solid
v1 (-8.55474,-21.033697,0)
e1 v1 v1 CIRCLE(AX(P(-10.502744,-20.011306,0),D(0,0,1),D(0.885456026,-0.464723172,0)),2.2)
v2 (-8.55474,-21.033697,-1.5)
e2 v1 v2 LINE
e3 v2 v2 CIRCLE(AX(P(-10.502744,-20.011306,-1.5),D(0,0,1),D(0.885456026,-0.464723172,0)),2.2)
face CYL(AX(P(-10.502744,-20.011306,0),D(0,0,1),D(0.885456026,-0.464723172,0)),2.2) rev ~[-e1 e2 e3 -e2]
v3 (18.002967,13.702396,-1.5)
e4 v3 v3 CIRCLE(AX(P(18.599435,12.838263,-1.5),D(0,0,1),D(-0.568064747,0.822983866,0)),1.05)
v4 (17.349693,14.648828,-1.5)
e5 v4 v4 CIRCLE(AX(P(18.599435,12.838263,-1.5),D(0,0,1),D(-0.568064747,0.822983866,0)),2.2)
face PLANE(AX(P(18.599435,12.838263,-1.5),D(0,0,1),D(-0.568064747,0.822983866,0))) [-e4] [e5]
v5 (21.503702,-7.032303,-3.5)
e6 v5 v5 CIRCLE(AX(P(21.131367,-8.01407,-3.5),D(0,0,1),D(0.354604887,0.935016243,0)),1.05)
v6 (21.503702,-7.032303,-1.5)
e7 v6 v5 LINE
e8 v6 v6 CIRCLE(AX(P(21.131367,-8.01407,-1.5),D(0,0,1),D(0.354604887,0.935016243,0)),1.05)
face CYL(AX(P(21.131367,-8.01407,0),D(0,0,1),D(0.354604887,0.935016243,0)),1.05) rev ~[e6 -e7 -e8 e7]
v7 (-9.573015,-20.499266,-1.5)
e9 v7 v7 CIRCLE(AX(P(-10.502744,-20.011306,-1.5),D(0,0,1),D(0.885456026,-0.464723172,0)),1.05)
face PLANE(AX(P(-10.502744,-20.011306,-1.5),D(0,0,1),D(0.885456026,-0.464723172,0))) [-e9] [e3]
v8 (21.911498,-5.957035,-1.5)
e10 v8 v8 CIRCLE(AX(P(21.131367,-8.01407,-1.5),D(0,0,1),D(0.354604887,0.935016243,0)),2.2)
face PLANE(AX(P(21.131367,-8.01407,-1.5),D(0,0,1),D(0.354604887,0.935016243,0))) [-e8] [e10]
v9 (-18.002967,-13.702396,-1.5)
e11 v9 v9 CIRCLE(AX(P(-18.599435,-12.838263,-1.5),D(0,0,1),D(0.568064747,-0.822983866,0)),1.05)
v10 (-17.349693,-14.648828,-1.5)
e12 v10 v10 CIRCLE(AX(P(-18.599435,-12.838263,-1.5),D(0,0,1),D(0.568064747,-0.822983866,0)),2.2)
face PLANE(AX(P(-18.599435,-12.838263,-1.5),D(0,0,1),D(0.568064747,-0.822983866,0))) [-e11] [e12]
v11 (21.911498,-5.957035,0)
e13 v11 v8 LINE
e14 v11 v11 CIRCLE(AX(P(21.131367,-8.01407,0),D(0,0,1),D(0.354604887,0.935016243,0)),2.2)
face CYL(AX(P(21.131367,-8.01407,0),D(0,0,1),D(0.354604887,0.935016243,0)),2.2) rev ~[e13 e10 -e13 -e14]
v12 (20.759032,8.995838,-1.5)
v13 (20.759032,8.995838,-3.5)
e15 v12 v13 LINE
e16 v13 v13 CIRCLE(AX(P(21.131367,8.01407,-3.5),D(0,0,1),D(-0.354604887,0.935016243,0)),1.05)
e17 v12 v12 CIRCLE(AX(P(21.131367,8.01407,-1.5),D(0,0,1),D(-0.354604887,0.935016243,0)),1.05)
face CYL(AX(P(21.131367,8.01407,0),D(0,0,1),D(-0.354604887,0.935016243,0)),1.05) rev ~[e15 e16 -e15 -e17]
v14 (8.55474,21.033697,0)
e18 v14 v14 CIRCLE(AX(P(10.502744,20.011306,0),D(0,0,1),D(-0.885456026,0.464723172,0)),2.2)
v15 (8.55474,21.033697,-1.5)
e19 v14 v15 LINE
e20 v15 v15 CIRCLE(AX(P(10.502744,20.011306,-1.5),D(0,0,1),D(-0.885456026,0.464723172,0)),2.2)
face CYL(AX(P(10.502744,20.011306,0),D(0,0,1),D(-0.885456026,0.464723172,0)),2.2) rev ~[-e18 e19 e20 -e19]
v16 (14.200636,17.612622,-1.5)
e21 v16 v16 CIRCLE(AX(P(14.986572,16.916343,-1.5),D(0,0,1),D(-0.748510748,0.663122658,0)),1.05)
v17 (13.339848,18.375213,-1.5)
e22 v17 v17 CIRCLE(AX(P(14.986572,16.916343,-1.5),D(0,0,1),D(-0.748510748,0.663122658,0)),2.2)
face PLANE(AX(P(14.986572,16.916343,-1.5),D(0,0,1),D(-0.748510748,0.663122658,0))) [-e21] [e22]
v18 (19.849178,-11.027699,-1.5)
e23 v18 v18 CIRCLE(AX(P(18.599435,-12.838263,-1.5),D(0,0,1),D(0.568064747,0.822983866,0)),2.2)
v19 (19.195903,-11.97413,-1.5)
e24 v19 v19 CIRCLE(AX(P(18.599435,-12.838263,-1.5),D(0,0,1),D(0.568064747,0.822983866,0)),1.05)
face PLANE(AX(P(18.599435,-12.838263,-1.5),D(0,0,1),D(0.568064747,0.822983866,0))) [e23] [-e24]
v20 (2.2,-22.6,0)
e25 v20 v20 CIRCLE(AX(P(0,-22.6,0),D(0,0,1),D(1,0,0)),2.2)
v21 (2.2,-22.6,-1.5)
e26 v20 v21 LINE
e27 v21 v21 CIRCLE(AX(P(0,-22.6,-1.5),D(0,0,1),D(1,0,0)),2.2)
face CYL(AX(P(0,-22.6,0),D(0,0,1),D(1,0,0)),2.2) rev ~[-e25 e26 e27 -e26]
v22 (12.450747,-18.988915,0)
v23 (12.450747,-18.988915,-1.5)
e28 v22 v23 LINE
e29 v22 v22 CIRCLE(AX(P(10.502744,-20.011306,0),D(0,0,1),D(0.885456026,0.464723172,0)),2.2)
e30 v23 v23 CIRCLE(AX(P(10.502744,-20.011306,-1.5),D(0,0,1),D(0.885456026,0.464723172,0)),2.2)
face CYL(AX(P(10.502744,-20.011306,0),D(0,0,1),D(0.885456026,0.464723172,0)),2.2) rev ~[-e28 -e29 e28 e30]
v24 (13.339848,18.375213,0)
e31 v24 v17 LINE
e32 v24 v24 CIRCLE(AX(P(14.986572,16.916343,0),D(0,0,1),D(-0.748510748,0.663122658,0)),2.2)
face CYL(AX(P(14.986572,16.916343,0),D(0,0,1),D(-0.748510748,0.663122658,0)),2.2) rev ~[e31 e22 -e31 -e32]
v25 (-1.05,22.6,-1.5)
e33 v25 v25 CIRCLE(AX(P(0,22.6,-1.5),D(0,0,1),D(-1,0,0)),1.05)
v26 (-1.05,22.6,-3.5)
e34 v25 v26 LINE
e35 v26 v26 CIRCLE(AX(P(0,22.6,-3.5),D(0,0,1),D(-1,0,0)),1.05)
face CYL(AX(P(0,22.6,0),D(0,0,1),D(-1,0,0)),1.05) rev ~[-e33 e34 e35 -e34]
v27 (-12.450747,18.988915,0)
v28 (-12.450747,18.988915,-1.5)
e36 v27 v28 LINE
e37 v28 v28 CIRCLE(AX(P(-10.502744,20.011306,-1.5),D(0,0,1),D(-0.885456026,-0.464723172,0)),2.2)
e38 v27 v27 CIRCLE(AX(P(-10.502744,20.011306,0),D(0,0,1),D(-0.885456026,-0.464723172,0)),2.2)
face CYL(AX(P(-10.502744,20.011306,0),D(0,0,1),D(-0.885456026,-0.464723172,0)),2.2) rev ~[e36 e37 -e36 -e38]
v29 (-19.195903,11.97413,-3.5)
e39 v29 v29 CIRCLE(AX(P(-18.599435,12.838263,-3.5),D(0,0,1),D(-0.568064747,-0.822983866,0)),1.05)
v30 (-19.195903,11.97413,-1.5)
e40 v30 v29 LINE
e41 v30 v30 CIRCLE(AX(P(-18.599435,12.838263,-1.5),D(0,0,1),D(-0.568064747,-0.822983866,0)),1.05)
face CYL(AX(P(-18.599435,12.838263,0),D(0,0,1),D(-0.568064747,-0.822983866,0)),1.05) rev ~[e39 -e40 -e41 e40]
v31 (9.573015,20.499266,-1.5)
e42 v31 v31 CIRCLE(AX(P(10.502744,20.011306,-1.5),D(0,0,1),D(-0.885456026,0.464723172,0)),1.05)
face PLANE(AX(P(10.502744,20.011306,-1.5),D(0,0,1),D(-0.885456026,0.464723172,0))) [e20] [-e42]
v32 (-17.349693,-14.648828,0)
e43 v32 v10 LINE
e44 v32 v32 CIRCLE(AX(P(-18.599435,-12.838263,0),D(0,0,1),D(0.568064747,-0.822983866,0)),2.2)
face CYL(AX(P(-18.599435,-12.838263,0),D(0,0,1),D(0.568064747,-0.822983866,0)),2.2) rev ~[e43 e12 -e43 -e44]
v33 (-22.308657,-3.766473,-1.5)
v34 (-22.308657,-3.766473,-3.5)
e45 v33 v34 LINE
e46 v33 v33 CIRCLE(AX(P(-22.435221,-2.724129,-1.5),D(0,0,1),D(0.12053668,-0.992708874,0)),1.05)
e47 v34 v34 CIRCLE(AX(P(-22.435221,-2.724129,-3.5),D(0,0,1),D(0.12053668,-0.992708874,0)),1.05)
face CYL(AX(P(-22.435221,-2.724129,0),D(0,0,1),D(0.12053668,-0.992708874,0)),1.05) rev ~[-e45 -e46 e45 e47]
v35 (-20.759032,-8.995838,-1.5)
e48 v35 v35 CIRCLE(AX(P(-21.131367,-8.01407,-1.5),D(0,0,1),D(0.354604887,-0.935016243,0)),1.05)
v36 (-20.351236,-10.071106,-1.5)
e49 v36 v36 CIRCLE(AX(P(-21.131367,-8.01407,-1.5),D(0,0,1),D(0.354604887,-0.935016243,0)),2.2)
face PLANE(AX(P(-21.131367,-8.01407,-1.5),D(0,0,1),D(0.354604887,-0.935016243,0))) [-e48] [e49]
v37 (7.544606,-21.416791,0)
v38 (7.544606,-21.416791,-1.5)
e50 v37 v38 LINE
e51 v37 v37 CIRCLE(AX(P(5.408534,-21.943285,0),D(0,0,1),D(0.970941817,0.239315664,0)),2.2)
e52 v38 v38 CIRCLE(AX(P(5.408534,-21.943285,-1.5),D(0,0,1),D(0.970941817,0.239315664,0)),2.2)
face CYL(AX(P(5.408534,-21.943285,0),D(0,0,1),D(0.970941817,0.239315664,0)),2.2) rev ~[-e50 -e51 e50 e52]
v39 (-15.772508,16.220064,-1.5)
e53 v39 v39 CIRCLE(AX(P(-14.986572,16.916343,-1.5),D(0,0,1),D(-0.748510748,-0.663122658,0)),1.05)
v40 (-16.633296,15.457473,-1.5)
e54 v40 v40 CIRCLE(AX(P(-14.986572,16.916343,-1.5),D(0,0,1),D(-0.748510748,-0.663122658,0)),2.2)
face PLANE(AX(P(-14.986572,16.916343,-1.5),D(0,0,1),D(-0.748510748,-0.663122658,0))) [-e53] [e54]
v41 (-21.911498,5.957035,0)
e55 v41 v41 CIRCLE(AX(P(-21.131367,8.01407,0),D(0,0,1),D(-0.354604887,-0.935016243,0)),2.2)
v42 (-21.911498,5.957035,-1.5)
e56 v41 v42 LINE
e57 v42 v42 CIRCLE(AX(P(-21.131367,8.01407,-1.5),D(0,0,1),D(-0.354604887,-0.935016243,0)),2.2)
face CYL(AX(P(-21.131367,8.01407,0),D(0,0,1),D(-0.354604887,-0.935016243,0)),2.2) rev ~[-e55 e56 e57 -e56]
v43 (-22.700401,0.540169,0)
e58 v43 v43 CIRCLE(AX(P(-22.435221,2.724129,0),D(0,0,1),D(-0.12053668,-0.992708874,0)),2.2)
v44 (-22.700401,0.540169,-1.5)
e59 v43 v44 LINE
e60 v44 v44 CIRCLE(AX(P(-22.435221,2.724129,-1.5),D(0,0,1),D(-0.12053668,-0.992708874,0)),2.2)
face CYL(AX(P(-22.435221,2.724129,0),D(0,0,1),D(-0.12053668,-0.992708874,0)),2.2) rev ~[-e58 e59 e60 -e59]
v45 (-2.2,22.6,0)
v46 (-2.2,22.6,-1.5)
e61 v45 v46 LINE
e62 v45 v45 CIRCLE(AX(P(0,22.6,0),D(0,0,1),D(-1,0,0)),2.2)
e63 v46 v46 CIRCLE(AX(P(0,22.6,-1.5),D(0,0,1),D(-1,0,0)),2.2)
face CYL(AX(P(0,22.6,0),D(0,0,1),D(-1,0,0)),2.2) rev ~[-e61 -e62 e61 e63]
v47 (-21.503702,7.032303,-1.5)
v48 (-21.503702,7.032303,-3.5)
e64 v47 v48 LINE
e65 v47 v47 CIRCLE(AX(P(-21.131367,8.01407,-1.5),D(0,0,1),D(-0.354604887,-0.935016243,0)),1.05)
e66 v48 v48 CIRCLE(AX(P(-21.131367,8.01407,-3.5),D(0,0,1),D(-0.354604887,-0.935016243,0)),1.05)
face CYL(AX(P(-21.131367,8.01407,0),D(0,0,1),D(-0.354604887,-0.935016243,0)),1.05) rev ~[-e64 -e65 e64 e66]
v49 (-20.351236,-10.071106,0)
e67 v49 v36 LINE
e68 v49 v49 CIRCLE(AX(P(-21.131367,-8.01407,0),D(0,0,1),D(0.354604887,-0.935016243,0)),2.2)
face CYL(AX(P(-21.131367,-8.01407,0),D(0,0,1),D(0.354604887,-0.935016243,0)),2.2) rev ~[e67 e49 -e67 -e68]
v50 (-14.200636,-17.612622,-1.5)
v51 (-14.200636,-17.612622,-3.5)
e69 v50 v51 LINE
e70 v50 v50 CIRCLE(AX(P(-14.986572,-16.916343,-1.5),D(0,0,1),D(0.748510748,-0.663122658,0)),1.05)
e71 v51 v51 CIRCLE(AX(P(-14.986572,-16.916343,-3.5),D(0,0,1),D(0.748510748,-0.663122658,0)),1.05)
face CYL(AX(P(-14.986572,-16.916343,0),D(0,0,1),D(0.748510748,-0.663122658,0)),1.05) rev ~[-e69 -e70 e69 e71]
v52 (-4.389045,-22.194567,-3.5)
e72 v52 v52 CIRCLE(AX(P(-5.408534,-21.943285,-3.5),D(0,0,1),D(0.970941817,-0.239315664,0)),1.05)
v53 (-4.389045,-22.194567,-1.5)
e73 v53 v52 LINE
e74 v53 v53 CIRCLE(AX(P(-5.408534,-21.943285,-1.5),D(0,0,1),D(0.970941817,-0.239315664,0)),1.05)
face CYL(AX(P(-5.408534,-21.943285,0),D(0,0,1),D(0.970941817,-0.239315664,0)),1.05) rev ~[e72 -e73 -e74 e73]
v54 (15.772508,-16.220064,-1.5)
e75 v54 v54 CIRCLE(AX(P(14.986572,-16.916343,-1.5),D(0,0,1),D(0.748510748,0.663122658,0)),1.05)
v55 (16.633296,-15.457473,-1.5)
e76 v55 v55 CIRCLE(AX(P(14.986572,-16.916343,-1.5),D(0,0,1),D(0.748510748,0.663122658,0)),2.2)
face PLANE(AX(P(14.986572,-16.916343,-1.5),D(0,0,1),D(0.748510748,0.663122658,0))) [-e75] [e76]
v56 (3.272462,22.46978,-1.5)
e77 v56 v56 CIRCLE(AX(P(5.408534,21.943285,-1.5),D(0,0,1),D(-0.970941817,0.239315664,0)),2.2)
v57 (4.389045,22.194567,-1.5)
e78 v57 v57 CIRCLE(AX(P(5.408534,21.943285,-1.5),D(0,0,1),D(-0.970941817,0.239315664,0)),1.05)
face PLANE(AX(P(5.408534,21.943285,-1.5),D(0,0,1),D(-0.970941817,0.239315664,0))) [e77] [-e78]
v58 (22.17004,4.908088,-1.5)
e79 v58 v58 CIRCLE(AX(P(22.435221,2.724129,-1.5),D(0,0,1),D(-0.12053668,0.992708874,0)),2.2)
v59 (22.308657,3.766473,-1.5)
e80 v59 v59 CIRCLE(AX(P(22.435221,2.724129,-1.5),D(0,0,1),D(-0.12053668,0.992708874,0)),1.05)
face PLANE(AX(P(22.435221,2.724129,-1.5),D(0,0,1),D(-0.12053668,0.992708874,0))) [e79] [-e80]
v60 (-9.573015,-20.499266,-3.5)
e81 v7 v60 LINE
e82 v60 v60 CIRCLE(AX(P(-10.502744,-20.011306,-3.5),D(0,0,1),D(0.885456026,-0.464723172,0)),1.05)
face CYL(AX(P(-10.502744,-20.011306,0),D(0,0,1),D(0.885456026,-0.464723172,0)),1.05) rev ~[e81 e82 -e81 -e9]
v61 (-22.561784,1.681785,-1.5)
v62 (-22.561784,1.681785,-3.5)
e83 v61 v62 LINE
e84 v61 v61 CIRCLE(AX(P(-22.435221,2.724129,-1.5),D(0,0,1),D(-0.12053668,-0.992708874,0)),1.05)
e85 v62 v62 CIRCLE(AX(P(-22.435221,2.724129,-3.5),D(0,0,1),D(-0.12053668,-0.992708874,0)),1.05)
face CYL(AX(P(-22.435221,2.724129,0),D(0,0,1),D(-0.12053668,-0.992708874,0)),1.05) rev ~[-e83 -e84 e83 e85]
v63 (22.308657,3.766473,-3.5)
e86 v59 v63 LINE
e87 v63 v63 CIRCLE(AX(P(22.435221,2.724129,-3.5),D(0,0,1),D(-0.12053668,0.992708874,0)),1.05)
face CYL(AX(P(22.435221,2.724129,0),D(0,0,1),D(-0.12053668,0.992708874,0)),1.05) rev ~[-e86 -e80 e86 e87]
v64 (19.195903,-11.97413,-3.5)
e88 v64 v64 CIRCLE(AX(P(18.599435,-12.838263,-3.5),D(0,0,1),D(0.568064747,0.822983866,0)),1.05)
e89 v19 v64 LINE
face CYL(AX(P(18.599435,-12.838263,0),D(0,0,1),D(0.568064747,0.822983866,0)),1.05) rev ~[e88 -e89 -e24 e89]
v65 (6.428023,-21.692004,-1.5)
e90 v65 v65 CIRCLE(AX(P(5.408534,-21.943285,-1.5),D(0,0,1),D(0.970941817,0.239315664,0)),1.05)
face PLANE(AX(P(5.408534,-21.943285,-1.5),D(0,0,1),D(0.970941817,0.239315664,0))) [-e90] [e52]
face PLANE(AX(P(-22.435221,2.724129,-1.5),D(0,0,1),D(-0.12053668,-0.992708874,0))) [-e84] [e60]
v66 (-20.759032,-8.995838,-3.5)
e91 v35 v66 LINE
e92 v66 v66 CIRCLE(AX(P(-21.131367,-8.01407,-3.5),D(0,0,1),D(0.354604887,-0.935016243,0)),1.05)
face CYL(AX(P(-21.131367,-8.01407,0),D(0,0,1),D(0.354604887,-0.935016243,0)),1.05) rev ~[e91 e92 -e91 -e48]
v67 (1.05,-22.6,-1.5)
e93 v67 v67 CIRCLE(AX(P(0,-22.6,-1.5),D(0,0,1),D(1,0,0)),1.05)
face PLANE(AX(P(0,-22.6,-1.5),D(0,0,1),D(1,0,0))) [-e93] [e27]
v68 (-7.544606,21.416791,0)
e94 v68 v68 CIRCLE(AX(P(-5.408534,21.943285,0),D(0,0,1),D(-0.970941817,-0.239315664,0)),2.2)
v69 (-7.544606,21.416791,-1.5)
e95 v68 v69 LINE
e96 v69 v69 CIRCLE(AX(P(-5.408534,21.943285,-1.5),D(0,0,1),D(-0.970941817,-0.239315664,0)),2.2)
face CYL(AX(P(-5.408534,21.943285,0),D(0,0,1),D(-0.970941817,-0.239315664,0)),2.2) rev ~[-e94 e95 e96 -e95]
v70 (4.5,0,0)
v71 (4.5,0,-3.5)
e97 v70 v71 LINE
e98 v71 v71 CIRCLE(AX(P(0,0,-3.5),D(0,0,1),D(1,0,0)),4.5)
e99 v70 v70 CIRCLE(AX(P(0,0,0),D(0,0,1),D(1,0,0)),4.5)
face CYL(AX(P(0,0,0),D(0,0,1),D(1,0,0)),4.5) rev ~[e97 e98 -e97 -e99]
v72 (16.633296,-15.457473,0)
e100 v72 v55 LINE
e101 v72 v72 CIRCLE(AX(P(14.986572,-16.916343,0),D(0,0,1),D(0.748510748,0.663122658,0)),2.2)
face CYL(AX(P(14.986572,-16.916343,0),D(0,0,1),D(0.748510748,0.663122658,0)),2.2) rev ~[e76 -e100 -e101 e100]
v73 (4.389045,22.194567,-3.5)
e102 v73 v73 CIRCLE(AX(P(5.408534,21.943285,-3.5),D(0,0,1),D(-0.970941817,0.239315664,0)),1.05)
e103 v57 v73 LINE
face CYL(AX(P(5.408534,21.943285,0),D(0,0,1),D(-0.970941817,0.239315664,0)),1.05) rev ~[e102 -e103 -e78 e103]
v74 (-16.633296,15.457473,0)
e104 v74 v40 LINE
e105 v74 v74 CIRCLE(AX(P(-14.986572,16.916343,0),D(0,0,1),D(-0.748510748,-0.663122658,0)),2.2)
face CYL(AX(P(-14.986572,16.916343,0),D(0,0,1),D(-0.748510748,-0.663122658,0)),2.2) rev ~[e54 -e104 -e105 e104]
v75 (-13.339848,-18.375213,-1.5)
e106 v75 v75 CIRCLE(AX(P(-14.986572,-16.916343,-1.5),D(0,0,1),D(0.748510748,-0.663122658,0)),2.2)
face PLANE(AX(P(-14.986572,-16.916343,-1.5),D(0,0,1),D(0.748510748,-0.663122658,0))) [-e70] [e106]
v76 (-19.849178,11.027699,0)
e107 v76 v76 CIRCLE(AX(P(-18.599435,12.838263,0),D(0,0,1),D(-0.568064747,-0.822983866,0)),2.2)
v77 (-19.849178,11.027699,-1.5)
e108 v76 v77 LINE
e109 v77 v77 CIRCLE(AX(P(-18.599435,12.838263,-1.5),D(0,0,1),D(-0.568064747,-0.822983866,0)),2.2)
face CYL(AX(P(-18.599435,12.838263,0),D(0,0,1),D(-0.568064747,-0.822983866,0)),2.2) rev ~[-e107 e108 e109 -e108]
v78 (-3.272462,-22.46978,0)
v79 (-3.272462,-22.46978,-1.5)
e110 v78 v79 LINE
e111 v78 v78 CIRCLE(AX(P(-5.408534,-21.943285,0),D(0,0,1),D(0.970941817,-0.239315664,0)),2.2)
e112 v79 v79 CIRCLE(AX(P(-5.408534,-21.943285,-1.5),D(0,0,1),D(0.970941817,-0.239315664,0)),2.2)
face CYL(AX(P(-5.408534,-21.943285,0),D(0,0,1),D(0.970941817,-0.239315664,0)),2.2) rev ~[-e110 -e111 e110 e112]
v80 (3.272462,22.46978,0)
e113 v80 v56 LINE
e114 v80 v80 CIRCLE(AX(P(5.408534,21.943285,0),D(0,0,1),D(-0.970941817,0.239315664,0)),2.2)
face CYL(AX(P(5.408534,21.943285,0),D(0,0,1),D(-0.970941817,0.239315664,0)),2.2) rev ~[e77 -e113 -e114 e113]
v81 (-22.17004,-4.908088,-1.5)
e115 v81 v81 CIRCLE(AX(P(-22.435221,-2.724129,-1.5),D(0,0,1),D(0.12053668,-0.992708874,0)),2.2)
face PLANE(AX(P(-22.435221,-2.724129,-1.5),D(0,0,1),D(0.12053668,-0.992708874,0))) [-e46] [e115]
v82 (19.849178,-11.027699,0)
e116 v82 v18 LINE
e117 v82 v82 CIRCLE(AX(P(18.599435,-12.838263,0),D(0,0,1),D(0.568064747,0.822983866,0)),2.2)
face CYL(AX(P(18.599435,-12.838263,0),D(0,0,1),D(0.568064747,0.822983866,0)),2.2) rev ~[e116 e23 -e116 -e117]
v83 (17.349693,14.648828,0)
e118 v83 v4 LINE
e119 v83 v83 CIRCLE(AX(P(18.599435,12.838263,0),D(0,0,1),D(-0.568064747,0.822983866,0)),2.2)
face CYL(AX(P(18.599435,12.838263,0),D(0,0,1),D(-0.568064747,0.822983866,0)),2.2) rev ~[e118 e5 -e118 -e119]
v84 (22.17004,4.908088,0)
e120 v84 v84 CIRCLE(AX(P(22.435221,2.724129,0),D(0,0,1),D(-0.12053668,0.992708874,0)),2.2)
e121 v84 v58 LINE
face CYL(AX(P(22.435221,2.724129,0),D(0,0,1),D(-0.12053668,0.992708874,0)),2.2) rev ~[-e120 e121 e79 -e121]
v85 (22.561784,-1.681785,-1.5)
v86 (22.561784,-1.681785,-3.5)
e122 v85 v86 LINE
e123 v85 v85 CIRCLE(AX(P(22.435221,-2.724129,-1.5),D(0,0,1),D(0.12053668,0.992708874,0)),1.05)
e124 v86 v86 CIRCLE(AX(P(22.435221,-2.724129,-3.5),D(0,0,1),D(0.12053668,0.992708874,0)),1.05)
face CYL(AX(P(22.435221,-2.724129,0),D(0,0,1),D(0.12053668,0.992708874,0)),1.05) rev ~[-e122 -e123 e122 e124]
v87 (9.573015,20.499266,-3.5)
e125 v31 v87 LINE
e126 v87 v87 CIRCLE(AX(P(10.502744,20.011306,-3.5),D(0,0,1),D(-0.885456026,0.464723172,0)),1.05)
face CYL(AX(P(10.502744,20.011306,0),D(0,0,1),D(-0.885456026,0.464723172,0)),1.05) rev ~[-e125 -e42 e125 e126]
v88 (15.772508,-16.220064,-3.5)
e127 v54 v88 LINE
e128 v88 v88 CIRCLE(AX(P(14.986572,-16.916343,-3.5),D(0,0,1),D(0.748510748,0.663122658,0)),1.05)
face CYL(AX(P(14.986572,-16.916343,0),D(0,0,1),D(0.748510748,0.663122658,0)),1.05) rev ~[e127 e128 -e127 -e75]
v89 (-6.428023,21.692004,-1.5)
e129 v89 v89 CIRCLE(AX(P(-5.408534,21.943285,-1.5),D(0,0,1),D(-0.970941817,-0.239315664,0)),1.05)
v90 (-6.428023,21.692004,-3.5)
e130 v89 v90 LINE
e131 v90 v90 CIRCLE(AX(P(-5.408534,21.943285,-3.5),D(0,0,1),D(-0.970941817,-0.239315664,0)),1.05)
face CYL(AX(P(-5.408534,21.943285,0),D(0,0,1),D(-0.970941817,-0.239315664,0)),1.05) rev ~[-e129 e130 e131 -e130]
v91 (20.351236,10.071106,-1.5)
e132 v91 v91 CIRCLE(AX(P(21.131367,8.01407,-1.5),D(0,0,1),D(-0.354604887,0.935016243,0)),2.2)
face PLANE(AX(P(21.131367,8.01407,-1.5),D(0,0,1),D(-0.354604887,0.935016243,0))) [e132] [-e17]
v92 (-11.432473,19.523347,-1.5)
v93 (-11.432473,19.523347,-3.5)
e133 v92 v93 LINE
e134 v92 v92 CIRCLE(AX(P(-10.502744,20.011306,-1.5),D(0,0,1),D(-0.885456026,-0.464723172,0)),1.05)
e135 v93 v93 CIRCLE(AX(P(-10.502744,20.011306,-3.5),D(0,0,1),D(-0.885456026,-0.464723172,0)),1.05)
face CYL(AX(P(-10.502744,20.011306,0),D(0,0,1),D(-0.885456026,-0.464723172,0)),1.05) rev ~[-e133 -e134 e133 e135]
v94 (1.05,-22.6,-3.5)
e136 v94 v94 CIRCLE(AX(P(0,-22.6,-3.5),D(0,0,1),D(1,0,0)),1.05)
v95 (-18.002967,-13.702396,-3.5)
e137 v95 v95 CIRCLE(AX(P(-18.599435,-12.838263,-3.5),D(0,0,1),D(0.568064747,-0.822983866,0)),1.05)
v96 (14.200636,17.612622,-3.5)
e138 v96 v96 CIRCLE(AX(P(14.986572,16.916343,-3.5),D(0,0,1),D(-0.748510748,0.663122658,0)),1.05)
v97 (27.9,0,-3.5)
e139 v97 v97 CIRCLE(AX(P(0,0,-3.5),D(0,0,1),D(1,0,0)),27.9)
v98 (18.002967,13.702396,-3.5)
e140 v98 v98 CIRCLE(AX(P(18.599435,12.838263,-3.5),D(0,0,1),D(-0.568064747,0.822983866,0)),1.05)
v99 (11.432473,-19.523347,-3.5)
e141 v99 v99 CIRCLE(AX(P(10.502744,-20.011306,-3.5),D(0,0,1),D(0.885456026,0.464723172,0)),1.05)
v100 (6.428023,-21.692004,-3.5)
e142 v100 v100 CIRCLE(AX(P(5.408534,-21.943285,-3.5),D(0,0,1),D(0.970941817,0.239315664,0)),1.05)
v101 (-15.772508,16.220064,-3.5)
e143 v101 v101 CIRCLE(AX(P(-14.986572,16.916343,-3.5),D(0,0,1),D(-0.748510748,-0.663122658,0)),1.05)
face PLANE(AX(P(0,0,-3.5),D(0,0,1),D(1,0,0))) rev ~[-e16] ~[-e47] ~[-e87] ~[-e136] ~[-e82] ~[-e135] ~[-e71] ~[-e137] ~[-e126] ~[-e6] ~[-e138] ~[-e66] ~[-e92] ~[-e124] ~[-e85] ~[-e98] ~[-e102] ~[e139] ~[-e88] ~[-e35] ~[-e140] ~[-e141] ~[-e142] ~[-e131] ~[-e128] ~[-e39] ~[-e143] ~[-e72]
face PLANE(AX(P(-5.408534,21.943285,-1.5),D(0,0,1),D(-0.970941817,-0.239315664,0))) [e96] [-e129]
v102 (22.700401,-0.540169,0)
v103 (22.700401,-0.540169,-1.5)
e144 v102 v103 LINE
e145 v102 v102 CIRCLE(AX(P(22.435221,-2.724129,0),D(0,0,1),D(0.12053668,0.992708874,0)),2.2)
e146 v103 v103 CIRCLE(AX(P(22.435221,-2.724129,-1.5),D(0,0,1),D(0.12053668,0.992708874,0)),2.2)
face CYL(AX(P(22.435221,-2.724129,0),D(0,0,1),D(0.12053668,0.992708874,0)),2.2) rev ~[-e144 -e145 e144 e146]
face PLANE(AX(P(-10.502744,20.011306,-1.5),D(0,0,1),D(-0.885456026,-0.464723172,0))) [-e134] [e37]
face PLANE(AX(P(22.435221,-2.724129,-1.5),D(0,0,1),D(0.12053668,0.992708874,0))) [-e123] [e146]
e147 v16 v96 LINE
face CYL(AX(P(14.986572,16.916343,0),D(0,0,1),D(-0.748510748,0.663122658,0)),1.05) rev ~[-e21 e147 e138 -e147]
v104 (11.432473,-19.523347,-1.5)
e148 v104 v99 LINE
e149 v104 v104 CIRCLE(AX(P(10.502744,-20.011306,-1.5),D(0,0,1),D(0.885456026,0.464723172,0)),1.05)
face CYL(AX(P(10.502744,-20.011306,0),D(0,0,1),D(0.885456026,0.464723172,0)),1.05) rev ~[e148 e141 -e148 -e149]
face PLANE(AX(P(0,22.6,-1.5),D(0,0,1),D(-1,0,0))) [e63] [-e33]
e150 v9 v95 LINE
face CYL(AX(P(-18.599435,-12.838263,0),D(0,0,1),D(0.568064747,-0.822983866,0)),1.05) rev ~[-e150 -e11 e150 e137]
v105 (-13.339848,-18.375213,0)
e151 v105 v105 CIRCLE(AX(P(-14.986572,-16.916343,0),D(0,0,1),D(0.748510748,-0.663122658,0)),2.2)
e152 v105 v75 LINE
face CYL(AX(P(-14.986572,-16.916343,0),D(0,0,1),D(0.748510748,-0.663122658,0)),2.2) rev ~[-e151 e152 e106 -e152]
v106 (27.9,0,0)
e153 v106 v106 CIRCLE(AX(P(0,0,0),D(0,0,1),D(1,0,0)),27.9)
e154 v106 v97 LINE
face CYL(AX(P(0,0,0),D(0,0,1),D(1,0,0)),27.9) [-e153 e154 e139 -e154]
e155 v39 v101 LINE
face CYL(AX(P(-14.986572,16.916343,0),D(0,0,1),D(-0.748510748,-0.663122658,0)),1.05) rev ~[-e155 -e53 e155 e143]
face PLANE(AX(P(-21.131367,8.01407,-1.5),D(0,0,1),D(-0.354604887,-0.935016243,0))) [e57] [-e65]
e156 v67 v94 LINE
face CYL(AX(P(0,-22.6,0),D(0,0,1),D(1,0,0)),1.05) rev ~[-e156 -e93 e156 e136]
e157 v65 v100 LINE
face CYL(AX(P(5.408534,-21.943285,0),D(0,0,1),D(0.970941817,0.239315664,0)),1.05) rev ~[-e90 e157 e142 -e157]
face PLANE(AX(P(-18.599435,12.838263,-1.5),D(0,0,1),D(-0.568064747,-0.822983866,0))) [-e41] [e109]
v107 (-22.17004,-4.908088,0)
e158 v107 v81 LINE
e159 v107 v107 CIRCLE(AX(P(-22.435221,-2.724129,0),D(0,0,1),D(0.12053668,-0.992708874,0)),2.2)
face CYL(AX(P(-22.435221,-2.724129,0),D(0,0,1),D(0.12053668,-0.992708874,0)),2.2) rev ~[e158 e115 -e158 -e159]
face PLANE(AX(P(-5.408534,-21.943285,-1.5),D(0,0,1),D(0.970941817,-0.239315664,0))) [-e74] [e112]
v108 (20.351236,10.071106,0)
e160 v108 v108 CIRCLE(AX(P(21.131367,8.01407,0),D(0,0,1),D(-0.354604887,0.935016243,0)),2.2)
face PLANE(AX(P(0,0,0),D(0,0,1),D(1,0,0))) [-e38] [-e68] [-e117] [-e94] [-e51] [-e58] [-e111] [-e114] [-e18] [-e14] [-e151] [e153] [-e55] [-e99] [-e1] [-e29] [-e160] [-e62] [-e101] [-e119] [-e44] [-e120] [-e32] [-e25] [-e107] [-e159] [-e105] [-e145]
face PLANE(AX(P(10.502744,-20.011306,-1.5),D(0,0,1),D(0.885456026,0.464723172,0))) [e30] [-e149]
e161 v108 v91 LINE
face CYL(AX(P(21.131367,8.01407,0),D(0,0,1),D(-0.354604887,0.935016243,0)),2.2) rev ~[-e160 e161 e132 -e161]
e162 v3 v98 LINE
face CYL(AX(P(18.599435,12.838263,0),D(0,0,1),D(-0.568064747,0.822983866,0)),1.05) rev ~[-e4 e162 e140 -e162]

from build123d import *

# Parameters (mm, degrees)
F0_R            = 27.9
F0_R_2          = 2.2
F0_R_3          = 4.5
F0_R_4          = 1.05
F1_DEPTH        = 3.5
F2_DEPTH        = 1.5
F2_COPIES_COUNT = 26
F3_DEPTH        = 3.5
F3_COPIES_COUNT = 26


# Not quite as in the source:
# - a pattern or mirror of a feature is missing from the dataset's text; its kind, count and spacing are read off the source's solid


with BuildPart() as f1:
    # F0 (on Top) → F1 (new body)
    with BuildSketch(Plane.XY):
        Circle(F0_R)
        with Locations((0, -22.6)):
            Circle(F0_R_2, mode=Mode.SUBTRACT)
        Circle(F0_R_3, mode=Mode.SUBTRACT)
        with Locations((0, -22.6)):
            Circle(F0_R_2)
        with Locations((0, -22.6)):
            Circle(F0_R_4, mode=Mode.SUBTRACT)
        with Locations((0, -22.6)):
            Circle(F0_R_4)
    extrude(amount=-F1_DEPTH)

    # F0 (on Top) → F2 (cut)
    with BuildSketch(Plane.XY):
        with Locations((0, -22.6)):
            Circle(F0_R_2)
        with Locations((0, -22.6)):
            Circle(F0_R_4, mode=Mode.SUBTRACT)
        with Locations((0, -22.6)):
            Circle(F0_R_4)
    f2 = extrude(amount=-F2_DEPTH, mode=Mode.SUBTRACT)

    # F2_copies: F2 ×26 about axis
    f2_copies_axis = Axis((0, 0, 0), (0, 0, 1))
    for i in range(1, F2_COPIES_COUNT):
        add(f2.rotate(f2_copies_axis, i * 360 / F2_COPIES_COUNT), mode=Mode.SUBTRACT)

    # F0 (on Top) → F3 (cut, through all)
    with BuildSketch(Plane.XY):
        with Locations((0, -22.6)):
            Circle(F0_R_4)
    f3 = extrude(amount=-F3_DEPTH, mode=Mode.SUBTRACT)

    # F3_copies: F3 ×26 about axis
    f3_copies_axis = Axis((0, 0, 0), (0, 0, 1))
    for i in range(1, F3_COPIES_COUNT):
        add(f3.rotate(f3_copies_axis, i * 360 / F3_COPIES_COUNT), mode=Mode.SUBTRACT)


solid = f1.part
